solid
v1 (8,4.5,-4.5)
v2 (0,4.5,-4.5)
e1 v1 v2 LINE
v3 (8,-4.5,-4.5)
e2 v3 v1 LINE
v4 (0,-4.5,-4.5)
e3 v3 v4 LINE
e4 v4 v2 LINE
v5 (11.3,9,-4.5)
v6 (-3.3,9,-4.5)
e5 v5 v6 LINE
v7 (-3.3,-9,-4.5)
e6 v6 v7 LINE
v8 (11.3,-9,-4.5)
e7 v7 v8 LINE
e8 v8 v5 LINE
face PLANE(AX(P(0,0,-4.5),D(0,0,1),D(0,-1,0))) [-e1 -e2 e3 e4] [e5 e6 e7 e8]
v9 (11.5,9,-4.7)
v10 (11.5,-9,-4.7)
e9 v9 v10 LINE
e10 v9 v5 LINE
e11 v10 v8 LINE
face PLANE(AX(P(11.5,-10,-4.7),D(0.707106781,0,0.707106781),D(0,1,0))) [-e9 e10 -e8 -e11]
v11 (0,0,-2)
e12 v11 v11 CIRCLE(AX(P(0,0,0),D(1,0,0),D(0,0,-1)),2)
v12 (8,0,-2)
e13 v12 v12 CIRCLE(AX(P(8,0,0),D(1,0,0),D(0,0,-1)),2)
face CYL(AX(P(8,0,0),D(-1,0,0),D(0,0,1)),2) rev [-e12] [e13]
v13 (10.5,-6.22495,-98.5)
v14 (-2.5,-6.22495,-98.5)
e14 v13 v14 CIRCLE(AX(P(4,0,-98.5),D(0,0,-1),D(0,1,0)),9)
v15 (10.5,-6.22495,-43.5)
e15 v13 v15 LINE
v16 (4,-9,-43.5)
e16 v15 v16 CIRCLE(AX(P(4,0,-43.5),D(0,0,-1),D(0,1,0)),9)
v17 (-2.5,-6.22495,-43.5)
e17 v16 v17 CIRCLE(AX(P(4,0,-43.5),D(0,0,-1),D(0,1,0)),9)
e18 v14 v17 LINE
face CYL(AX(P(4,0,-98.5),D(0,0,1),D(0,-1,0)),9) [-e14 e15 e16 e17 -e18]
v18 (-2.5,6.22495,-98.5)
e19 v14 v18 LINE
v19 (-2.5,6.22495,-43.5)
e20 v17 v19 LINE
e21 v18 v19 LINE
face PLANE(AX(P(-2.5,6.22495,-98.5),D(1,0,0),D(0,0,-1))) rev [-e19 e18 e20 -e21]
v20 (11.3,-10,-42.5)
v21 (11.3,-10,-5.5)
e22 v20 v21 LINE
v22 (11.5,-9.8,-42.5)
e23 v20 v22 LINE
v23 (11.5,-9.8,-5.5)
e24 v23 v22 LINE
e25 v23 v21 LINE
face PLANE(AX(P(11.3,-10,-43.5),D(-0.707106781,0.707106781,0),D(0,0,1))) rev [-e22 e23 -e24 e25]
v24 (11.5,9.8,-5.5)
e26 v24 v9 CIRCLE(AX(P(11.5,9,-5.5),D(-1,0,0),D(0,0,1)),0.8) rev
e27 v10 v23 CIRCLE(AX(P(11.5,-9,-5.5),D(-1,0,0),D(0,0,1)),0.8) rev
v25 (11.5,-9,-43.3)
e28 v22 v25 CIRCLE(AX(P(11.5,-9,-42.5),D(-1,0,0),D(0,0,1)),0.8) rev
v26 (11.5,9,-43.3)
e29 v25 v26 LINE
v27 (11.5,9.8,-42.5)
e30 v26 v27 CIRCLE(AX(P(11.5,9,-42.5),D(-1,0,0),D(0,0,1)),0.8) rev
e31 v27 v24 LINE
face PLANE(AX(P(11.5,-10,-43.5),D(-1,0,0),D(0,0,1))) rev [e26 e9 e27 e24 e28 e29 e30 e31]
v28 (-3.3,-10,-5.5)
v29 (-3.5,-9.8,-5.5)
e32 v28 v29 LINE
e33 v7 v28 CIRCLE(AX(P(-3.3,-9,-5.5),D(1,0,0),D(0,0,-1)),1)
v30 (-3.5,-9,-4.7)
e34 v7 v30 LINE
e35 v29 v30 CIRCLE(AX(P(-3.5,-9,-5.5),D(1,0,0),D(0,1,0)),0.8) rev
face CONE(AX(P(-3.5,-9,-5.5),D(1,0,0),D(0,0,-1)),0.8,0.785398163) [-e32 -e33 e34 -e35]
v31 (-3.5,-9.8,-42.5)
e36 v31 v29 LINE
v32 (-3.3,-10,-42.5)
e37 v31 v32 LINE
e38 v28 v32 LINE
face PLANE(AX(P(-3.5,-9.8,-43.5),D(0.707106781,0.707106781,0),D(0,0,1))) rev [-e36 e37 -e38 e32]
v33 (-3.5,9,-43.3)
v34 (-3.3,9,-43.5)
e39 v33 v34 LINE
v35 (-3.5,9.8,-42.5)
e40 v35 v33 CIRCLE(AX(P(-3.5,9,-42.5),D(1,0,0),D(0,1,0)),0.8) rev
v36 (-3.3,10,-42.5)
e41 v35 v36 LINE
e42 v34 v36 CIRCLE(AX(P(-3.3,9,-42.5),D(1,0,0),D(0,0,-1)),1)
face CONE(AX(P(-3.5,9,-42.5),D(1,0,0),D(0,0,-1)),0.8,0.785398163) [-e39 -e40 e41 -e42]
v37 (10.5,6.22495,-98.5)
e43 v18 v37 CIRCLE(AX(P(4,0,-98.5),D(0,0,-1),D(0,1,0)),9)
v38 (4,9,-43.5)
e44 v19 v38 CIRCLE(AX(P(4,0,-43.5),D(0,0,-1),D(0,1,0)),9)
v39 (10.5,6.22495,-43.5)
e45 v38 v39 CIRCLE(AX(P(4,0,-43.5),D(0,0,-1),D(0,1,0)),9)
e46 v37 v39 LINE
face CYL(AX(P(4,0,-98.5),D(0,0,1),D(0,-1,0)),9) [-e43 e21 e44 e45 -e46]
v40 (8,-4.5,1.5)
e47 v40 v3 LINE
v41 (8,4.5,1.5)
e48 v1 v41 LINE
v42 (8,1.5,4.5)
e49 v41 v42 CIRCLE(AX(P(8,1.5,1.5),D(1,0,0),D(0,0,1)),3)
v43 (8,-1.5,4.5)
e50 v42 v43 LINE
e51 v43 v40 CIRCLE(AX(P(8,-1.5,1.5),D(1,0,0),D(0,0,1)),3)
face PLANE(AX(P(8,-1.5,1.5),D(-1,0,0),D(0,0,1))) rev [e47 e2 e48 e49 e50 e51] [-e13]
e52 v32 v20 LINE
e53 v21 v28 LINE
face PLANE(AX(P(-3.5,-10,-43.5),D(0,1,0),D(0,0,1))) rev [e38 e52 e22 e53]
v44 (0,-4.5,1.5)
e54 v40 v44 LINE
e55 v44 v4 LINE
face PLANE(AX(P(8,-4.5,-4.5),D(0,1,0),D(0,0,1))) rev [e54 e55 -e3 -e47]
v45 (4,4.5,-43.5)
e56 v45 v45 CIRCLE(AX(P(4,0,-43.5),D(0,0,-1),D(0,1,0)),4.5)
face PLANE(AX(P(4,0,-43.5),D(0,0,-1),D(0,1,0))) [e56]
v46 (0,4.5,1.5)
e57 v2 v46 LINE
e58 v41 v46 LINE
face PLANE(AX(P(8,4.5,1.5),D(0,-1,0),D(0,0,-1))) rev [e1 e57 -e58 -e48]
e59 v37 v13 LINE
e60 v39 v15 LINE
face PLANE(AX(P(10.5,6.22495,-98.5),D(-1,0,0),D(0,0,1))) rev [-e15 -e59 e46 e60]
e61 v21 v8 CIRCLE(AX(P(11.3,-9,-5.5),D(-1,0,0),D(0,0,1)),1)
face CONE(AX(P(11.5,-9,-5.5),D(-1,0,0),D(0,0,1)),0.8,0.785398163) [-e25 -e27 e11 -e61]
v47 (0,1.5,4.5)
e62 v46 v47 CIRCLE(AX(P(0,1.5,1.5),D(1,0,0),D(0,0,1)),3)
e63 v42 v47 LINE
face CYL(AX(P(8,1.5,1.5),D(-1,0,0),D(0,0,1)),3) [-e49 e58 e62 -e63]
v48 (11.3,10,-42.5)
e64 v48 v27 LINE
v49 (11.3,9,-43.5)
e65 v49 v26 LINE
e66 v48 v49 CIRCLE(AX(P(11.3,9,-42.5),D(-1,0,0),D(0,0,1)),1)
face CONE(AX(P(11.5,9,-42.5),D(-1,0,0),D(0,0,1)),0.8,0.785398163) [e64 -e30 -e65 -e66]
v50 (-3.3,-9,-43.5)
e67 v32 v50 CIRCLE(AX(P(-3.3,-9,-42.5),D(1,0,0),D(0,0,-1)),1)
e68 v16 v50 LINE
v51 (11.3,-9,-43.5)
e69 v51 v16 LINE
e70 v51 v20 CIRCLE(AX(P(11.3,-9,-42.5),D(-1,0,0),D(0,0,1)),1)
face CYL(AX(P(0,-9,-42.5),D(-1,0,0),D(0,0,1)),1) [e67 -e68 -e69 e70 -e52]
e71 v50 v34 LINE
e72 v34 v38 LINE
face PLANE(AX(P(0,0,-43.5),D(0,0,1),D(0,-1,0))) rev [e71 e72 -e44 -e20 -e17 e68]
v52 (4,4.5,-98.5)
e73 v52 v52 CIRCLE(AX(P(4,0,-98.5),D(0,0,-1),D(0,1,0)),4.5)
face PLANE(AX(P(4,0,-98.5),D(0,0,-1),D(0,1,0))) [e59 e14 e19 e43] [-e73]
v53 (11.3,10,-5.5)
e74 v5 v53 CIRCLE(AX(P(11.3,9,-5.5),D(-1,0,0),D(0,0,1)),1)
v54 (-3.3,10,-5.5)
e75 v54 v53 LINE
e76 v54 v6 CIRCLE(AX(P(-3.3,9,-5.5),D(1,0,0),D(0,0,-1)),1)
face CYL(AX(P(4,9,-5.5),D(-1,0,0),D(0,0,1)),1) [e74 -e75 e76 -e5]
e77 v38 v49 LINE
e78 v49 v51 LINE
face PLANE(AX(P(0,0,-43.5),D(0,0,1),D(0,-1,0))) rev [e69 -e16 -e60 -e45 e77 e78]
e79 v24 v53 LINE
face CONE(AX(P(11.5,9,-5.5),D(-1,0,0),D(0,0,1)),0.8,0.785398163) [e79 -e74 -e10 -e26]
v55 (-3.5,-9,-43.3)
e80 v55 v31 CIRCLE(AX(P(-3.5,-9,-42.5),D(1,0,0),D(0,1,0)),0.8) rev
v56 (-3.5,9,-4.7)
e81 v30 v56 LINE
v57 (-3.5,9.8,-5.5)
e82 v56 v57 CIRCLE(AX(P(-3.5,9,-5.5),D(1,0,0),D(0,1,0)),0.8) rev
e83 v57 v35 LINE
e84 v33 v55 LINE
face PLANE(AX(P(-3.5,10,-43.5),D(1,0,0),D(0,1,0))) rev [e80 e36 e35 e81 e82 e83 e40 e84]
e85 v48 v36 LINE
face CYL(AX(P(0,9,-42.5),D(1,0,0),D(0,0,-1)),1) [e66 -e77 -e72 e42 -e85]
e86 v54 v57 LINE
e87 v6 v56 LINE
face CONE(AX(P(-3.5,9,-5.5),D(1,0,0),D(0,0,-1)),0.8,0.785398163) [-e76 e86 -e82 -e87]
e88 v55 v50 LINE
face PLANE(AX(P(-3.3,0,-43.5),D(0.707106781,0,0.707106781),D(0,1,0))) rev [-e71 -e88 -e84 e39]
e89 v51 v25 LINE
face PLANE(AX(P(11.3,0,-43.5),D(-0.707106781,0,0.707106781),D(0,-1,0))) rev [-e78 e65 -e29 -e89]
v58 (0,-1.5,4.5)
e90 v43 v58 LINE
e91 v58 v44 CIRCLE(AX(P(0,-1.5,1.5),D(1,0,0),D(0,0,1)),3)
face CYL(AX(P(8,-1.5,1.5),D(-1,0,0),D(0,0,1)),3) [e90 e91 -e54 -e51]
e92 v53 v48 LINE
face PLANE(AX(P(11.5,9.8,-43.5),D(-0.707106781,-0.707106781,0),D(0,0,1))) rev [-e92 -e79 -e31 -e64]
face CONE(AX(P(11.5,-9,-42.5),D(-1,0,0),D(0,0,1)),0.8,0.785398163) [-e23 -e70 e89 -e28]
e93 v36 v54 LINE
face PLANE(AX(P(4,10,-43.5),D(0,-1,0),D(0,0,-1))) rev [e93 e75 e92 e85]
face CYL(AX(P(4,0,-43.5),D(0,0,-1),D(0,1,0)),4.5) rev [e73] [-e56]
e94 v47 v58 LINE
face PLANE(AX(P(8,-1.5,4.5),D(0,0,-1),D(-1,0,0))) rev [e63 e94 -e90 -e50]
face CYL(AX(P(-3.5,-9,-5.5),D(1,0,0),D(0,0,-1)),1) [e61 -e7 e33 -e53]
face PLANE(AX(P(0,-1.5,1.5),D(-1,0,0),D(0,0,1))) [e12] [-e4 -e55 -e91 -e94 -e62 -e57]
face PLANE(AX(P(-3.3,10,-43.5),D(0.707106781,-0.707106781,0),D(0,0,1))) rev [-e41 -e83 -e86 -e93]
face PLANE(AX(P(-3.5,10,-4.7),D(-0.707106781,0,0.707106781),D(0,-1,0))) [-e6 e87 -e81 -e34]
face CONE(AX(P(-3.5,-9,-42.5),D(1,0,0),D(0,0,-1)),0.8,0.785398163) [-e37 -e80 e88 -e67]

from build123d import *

# Parameters (mm, degrees)
SKETCH_1_R          = 2
EXTRUDE_1_DEPTH     = 8
EXTRUDE_2_DEPTH     = 39
EXTRUDE_3_DEPTH     = 55
SKETCH_4_R          = 4.5
CUT_EXTRUDE_1_DEPTH = 55
FILLET_1_R          = 1
CHAMFER_1_SIZE      = 0.2


with BuildPart() as part:
    # 草图1 → 凸台-拉伸1 (new body)
    with BuildSketch(Plane(origin=(0, 0, 0), x_dir=(0, 0, -1), z_dir=(1, 0, 0))):
        with BuildLine():
            Line((0, 4.5), (4.5, 4.5))
            Line((4.5, 4.5), (4.5, -4.5))
            Line((4.5, -4.5), (-1.5, -4.5))
            ThreePointArc((-1.5, -4.5), (-3.621320344, -3.621320344), (-4.5, -1.5))
            Line((-4.5, -1.5), (-4.5, 1.5))
            ThreePointArc((-4.5, 1.5), (-3.621320344, 3.621320344), (-1.5, 4.5))
            Line((-1.5, 4.5), (0, 4.5))
        make_face()
        Circle(SKETCH_1_R, mode=Mode.SUBTRACT)
    extrude(amount=EXTRUDE_1_DEPTH)

    # 草图2 → 凸台-拉伸2 (add)
    with BuildSketch(Plane(origin=(0, 0, -4.5), x_dir=(-1, 0, 0), z_dir=(0, 0, -1))):
        Polygon((-4, 10), (3.5, 10), (3.5, -10), (-11.5, -10), (-11.5, 10), align=None)
    extrude(amount=EXTRUDE_2_DEPTH)

    # 草图3 → 凸台-拉伸3 (add)
    with BuildSketch(Plane(origin=(0, 0, -43.5), x_dir=(-1, 0, 0), z_dir=(0, 0, -1))):
        with BuildLine():
            Line((2.5, 6.224949799), (2.5, -6.224949799))
            ThreePointArc((2.5, -6.224949799), (-4, -9), (-10.5, -6.224949799))
            Line((-10.5, -6.224949799), (-10.5, 6.224949799))
            ThreePointArc((-10.5, 6.224949799), (-4, 9), (2.5, 6.224949799))
        make_face()
    extrude(amount=EXTRUDE_3_DEPTH)

    # 草图4 → 切除-拉伸1 (cut)
    with BuildSketch(Plane(origin=(0, 0, -98.5), x_dir=(-1, 0, 0), z_dir=(0, 0, -1))):
        with Locations(Location((-4, 0, 0), (0, 0, 90))):
            Circle(SKETCH_4_R)
    extrude(amount=-CUT_EXTRUDE_1_DEPTH, mode=Mode.SUBTRACT)

    # 圆角1
    fillet_1_edges = [part.edges().sort_by_distance(p)[0] for p in [
        (4, -10, -4.5),
        (4, 10, -4.5),
        (4, 10, -43.5),
        (4, -10, -43.5),
    ]]
    fillet(fillet_1_edges, radius=FILLET_1_R - 0.0001)  # a hair under: the kernel refuses the full size

    # 倒角1
    chamfer_1_edges = [part.edges().sort_by_distance(p)[0] for p in [
        (-3.5, -10, -24),
        (11.5, -10, -24),
        (-3.5, 0, -4.5),
        (-3.5, 10, -24),
        (-3.5, 0, -43.5),
        (-3.5, 9.707136071, -4.792863929),
        (-3.5, 9.707136071, -43.207136071),
        (-3.5, -9.707136071, -43.207136071),
        (-3.5, -9.707136071, -4.792863929),
        (11.5, 0, -4.5),
        (11.5, 0, -43.5),
        (11.5, 10, -24),
        (11.5, 9.707136071, -4.792863929),
        (11.5, 9.707136071, -43.207136071),
        (11.5, -9.707136071, -43.207136071),
        (11.5, -9.707136071, -4.792863929),
    ]]
    chamfer(chamfer_1_edges, length=CHAMFER_1_SIZE)


solid = part.part
